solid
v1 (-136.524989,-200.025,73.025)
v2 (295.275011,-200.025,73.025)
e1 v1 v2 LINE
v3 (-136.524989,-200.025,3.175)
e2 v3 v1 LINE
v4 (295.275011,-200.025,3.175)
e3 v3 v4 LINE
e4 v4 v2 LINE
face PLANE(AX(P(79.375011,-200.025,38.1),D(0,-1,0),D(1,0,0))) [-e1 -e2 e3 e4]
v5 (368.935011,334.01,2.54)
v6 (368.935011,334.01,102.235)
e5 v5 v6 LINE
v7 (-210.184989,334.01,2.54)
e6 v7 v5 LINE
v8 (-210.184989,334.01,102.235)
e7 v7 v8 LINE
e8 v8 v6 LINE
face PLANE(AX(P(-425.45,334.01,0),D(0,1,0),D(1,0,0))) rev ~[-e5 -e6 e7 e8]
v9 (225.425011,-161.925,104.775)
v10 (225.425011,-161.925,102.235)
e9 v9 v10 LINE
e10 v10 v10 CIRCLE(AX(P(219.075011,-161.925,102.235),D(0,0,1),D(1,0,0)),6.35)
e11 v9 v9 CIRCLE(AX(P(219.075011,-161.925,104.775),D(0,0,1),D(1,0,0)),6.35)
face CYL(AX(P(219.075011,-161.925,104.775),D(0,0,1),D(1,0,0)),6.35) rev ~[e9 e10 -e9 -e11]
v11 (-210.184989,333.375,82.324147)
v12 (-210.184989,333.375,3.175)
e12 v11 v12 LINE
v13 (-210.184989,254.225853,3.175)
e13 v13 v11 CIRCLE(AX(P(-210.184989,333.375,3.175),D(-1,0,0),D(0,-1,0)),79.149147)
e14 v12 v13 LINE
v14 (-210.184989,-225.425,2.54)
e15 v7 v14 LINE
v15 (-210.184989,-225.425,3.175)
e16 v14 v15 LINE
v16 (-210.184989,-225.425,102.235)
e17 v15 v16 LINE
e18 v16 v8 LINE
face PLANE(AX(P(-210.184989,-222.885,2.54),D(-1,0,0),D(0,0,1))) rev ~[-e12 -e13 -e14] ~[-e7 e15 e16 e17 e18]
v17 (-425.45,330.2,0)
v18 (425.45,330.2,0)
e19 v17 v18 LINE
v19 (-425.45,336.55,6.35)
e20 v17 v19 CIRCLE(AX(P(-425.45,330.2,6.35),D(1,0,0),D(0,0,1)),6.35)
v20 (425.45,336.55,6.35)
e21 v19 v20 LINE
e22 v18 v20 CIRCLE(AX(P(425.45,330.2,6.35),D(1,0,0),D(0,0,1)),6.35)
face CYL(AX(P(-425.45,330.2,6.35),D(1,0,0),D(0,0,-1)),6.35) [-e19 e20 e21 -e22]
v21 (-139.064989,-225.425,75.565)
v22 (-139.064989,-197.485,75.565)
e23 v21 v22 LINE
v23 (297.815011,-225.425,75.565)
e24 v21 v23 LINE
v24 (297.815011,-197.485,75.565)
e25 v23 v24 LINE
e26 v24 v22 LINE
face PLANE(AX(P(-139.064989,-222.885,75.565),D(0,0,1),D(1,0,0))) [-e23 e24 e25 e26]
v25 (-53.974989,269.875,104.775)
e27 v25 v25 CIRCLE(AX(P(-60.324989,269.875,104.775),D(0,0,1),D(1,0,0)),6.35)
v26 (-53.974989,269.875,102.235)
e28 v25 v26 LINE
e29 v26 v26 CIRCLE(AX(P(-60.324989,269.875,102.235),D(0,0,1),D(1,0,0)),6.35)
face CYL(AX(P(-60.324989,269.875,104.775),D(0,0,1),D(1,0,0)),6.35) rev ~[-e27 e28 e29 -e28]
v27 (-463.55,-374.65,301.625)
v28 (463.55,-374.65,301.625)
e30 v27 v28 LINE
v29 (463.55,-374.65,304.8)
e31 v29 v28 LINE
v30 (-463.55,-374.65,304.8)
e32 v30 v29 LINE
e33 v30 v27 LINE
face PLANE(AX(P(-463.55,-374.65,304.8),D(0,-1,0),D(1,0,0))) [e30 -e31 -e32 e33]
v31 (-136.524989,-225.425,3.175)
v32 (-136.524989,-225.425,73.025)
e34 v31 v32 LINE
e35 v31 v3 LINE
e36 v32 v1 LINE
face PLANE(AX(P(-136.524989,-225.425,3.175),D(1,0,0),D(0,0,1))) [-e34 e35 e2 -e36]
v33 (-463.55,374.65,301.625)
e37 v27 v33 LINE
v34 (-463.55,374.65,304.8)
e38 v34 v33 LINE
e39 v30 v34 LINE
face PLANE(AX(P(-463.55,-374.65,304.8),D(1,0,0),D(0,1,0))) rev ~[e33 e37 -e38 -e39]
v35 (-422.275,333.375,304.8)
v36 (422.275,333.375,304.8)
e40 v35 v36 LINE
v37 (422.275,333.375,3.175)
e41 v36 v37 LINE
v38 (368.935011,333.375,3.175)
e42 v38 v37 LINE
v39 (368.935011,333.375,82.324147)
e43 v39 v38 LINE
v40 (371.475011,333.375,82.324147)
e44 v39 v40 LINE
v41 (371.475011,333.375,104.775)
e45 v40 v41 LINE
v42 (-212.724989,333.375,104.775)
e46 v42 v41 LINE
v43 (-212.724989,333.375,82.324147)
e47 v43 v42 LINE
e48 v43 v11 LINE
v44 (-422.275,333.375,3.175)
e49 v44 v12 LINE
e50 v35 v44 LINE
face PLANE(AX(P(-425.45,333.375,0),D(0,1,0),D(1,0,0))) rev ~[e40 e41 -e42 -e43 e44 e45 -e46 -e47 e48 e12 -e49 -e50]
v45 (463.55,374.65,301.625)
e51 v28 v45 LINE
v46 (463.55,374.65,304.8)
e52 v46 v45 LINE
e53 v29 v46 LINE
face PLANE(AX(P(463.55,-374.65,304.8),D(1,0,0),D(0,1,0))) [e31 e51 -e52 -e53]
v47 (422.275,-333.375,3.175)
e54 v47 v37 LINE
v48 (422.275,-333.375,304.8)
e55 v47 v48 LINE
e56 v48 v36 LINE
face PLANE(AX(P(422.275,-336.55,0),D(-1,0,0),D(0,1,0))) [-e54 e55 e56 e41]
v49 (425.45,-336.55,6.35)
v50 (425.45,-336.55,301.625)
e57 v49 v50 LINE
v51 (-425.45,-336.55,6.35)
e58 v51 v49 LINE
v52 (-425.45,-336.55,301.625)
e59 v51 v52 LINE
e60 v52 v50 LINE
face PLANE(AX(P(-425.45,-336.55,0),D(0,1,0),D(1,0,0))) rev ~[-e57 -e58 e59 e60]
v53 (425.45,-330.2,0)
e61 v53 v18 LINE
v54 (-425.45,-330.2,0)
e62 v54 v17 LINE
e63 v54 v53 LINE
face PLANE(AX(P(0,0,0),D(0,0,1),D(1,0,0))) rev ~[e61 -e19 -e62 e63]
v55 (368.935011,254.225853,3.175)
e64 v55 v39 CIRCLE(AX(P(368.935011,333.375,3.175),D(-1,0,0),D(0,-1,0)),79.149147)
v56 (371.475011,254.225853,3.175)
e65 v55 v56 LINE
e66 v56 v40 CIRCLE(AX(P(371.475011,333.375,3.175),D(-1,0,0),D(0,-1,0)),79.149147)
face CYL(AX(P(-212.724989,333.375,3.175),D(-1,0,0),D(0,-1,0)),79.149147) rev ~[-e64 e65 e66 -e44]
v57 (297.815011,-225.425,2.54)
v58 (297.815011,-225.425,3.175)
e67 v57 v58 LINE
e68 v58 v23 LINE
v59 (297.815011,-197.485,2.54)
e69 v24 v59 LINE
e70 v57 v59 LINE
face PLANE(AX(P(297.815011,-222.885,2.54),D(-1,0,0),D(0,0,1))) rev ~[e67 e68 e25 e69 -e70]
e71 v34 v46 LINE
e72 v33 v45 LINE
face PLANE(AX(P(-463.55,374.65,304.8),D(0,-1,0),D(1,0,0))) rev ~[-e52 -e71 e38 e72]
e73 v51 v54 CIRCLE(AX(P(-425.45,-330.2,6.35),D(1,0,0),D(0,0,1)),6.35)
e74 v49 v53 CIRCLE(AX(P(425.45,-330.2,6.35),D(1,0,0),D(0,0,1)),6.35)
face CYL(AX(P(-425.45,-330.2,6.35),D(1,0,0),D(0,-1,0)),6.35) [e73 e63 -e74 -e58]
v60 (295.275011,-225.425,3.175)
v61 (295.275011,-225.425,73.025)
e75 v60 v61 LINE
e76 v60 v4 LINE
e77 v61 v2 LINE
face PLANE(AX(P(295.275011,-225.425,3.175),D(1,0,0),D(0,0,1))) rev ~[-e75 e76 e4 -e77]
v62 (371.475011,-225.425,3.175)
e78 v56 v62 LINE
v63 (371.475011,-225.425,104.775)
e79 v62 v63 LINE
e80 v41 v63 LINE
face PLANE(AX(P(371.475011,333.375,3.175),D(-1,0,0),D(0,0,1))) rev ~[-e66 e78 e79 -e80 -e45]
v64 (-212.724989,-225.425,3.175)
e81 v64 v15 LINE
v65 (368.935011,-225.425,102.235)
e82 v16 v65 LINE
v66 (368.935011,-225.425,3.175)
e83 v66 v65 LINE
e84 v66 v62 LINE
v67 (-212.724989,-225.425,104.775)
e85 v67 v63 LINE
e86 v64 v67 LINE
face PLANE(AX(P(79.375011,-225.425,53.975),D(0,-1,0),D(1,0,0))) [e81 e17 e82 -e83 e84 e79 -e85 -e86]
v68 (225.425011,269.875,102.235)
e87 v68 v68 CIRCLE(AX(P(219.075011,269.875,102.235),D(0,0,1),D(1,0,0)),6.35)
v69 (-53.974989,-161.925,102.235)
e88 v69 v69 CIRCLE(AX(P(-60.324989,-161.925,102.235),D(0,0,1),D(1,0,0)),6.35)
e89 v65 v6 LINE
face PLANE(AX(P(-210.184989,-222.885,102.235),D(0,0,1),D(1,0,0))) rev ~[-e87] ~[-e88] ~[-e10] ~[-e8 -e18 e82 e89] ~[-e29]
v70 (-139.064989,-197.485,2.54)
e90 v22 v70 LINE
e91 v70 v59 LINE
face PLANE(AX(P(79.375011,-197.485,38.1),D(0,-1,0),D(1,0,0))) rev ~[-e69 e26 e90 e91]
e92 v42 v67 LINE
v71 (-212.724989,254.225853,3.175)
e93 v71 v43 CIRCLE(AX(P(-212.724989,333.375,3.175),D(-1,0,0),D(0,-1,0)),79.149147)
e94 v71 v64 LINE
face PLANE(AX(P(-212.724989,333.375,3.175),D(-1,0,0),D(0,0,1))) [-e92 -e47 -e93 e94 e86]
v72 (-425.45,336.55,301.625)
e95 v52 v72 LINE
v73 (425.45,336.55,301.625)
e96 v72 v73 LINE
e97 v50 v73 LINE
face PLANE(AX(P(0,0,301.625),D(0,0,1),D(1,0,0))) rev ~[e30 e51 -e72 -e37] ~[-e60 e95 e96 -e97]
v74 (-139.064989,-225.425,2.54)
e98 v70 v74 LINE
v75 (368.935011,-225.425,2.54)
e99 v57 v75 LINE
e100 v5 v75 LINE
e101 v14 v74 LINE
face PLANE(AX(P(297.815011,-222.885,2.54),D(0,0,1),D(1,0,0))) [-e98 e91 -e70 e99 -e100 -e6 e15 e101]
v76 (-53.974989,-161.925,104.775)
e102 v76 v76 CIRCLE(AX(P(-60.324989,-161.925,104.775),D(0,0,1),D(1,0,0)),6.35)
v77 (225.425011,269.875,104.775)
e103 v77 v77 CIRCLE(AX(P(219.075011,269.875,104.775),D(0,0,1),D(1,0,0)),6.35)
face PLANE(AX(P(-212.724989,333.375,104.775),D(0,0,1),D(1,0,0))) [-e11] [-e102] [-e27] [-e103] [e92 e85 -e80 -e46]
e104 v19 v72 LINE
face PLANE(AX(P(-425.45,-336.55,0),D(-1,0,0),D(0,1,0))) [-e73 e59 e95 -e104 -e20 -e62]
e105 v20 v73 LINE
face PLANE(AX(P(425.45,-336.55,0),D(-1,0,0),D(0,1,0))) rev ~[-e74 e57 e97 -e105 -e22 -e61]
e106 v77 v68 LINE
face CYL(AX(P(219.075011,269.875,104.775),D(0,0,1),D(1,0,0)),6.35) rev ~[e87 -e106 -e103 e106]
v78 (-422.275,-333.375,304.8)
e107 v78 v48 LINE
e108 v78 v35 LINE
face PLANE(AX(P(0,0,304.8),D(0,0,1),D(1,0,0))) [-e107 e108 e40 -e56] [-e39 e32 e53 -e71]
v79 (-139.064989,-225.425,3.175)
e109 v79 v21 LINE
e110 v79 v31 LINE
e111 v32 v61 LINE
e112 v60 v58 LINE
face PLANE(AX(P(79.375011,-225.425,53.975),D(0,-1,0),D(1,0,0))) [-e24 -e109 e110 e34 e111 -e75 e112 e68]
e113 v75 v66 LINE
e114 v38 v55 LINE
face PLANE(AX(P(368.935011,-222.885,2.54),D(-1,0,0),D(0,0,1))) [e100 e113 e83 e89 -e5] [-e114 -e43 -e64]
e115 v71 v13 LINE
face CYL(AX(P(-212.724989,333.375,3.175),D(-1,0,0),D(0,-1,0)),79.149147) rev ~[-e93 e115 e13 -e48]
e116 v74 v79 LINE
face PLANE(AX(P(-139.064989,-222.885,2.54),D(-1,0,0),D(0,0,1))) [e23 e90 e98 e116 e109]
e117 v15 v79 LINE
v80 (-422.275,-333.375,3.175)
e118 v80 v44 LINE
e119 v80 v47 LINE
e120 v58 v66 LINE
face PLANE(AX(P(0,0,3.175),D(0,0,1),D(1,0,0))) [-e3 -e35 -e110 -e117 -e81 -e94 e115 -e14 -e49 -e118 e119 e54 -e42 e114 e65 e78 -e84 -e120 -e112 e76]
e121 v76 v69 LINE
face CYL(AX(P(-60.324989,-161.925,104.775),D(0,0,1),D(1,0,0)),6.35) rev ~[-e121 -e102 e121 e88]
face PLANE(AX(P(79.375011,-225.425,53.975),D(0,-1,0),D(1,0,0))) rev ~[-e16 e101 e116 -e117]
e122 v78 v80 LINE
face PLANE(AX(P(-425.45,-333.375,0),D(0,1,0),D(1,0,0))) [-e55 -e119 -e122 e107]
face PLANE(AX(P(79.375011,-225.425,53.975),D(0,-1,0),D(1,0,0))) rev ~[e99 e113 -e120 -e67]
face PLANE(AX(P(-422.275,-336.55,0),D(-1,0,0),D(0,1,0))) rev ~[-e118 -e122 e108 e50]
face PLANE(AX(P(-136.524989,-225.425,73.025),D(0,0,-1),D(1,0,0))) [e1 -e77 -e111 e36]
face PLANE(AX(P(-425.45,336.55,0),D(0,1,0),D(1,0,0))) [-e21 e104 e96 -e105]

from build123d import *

# Parameters (mm, degrees)
F0_W      = 850.9
F0_H      = 673.1
F1_DEPTH  = 304.8
F2_T      = -3.175
F3_W      = 584.2
F3_H      = 101.6
F4_DEPTH  = 558.8
F5_W      = 431.8
F5_H      = 69.85
F6_DEPTH  = 25.4
F7_T      = -2.54
F8_R      = 6.35
F9_DEPTH  = 2.54
F10_W     = 927.1
F10_H     = 749.3
F10_W_2   = 850.9
F10_H_2   = 673.1
F11_DEPTH = 3.175
F12_R     = 6.35
F13_R     = 6.35
F15_DEPTH = 584.2


# Not quite as in the source:
# - a shell that OpenCascade refuses in one call is made with other operations: the cavity is built on its own and cut out


with BuildPart() as f1:
    # F0 (on Top) → F1 (new body)
    with BuildSketch(Plane.XY):
        Rectangle(F0_W, F0_H)
    extrude(amount=F1_DEPTH)

    # F2
    f2_openings = [f1.faces().sort_by_distance(p)[0] for p in [
        (0, 0, 304.8),
    ]]
    offset(amount=F2_T, openings=f2_openings)

    # F3 (on face) → F4 (join)
    with BuildSketch(Plane.XZ.offset(-333.375)):
        with Locations((79.3750111103, 53.975)):
            Rectangle(F3_W, F3_H)
    extrude(amount=F4_DEPTH)

    # F5 (on face) → F6 (cut)
    with BuildSketch(Plane.XZ.offset(225.425)):
        with Locations((79.3750111103, 38.1)):
            Rectangle(F5_W, F5_H)
    extrude(amount=-F6_DEPTH, mode=Mode.SUBTRACT)

    # F7: a shell. OpenCascade refuses it in one call, so the cavity is built on its own and cut out:
    # the body offset inwards by the wall thickness, plus a prism from it out through each open face.
    f7_core = offset(f1.part, amount=F7_T, kind=Kind.INTERSECTION, mode=Mode.PRIVATE)
    f7_exits = [f7_core.faces().sort_by_distance(p)[0] for p in [
        (303.691397, -222.885, 39.0525),
    ]]
    add(f7_core, mode=Mode.SUBTRACT)
    extrude(f7_exits, amount=-F7_T, mode=Mode.SUBTRACT)

    # F8 (on face) → F9 (cut, through all)
    with BuildSketch(Plane.XY.offset(104.775)):
        with Locations((219.0750111103, 269.875)):
            Circle(F8_R)
        with Locations((-60.3249888897, 269.875)):
            Circle(F8_R)
        with Locations((-60.3249888897, -161.925)):
            Circle(F8_R)
        with Locations((219.0750111103, -161.925)):
            Circle(F8_R)
    extrude(amount=-F9_DEPTH, mode=Mode.SUBTRACT)

    # F10 (on face) → F11 (join)
    with BuildSketch(Plane.XY.offset(304.8)):
        Rectangle(F10_W, F10_H)
        Rectangle(F10_W_2, F10_H_2, mode=Mode.SUBTRACT)
    extrude(amount=-F11_DEPTH)

    # F12
    f12_edges = [f1.edges().sort_by_distance(p)[0] for p in [
        (0, -336.55, 0),
    ]]
    fillet(f12_edges, radius=F12_R)

    # F13
    f13_edges = [f1.edges().sort_by_distance(p)[0] for p in [
        (0, 336.55, 0),
    ]]
    fillet(f13_edges, radius=F13_R)

    # F14 (on face) → F15 (cut, through all)
    with BuildSketch(Plane(origin=(-212.7249888897, 0, 0), x_dir=(0, -1, 0), z_dir=(-1, 0, 0))):
        with BuildLine():
            ThreePointArc((-254.2258527756, 3.175), (-277.4081012725, 59.1418987275), (-333.375, 82.3241472244))
            Line((-333.375, 82.3241472244), (-333.375, 3.175))
            Line((-333.375, 3.175), (-254.2258527756, 3.175))
        make_face()
    extrude(amount=-F15_DEPTH, mode=Mode.SUBTRACT)


solid = f1.part
